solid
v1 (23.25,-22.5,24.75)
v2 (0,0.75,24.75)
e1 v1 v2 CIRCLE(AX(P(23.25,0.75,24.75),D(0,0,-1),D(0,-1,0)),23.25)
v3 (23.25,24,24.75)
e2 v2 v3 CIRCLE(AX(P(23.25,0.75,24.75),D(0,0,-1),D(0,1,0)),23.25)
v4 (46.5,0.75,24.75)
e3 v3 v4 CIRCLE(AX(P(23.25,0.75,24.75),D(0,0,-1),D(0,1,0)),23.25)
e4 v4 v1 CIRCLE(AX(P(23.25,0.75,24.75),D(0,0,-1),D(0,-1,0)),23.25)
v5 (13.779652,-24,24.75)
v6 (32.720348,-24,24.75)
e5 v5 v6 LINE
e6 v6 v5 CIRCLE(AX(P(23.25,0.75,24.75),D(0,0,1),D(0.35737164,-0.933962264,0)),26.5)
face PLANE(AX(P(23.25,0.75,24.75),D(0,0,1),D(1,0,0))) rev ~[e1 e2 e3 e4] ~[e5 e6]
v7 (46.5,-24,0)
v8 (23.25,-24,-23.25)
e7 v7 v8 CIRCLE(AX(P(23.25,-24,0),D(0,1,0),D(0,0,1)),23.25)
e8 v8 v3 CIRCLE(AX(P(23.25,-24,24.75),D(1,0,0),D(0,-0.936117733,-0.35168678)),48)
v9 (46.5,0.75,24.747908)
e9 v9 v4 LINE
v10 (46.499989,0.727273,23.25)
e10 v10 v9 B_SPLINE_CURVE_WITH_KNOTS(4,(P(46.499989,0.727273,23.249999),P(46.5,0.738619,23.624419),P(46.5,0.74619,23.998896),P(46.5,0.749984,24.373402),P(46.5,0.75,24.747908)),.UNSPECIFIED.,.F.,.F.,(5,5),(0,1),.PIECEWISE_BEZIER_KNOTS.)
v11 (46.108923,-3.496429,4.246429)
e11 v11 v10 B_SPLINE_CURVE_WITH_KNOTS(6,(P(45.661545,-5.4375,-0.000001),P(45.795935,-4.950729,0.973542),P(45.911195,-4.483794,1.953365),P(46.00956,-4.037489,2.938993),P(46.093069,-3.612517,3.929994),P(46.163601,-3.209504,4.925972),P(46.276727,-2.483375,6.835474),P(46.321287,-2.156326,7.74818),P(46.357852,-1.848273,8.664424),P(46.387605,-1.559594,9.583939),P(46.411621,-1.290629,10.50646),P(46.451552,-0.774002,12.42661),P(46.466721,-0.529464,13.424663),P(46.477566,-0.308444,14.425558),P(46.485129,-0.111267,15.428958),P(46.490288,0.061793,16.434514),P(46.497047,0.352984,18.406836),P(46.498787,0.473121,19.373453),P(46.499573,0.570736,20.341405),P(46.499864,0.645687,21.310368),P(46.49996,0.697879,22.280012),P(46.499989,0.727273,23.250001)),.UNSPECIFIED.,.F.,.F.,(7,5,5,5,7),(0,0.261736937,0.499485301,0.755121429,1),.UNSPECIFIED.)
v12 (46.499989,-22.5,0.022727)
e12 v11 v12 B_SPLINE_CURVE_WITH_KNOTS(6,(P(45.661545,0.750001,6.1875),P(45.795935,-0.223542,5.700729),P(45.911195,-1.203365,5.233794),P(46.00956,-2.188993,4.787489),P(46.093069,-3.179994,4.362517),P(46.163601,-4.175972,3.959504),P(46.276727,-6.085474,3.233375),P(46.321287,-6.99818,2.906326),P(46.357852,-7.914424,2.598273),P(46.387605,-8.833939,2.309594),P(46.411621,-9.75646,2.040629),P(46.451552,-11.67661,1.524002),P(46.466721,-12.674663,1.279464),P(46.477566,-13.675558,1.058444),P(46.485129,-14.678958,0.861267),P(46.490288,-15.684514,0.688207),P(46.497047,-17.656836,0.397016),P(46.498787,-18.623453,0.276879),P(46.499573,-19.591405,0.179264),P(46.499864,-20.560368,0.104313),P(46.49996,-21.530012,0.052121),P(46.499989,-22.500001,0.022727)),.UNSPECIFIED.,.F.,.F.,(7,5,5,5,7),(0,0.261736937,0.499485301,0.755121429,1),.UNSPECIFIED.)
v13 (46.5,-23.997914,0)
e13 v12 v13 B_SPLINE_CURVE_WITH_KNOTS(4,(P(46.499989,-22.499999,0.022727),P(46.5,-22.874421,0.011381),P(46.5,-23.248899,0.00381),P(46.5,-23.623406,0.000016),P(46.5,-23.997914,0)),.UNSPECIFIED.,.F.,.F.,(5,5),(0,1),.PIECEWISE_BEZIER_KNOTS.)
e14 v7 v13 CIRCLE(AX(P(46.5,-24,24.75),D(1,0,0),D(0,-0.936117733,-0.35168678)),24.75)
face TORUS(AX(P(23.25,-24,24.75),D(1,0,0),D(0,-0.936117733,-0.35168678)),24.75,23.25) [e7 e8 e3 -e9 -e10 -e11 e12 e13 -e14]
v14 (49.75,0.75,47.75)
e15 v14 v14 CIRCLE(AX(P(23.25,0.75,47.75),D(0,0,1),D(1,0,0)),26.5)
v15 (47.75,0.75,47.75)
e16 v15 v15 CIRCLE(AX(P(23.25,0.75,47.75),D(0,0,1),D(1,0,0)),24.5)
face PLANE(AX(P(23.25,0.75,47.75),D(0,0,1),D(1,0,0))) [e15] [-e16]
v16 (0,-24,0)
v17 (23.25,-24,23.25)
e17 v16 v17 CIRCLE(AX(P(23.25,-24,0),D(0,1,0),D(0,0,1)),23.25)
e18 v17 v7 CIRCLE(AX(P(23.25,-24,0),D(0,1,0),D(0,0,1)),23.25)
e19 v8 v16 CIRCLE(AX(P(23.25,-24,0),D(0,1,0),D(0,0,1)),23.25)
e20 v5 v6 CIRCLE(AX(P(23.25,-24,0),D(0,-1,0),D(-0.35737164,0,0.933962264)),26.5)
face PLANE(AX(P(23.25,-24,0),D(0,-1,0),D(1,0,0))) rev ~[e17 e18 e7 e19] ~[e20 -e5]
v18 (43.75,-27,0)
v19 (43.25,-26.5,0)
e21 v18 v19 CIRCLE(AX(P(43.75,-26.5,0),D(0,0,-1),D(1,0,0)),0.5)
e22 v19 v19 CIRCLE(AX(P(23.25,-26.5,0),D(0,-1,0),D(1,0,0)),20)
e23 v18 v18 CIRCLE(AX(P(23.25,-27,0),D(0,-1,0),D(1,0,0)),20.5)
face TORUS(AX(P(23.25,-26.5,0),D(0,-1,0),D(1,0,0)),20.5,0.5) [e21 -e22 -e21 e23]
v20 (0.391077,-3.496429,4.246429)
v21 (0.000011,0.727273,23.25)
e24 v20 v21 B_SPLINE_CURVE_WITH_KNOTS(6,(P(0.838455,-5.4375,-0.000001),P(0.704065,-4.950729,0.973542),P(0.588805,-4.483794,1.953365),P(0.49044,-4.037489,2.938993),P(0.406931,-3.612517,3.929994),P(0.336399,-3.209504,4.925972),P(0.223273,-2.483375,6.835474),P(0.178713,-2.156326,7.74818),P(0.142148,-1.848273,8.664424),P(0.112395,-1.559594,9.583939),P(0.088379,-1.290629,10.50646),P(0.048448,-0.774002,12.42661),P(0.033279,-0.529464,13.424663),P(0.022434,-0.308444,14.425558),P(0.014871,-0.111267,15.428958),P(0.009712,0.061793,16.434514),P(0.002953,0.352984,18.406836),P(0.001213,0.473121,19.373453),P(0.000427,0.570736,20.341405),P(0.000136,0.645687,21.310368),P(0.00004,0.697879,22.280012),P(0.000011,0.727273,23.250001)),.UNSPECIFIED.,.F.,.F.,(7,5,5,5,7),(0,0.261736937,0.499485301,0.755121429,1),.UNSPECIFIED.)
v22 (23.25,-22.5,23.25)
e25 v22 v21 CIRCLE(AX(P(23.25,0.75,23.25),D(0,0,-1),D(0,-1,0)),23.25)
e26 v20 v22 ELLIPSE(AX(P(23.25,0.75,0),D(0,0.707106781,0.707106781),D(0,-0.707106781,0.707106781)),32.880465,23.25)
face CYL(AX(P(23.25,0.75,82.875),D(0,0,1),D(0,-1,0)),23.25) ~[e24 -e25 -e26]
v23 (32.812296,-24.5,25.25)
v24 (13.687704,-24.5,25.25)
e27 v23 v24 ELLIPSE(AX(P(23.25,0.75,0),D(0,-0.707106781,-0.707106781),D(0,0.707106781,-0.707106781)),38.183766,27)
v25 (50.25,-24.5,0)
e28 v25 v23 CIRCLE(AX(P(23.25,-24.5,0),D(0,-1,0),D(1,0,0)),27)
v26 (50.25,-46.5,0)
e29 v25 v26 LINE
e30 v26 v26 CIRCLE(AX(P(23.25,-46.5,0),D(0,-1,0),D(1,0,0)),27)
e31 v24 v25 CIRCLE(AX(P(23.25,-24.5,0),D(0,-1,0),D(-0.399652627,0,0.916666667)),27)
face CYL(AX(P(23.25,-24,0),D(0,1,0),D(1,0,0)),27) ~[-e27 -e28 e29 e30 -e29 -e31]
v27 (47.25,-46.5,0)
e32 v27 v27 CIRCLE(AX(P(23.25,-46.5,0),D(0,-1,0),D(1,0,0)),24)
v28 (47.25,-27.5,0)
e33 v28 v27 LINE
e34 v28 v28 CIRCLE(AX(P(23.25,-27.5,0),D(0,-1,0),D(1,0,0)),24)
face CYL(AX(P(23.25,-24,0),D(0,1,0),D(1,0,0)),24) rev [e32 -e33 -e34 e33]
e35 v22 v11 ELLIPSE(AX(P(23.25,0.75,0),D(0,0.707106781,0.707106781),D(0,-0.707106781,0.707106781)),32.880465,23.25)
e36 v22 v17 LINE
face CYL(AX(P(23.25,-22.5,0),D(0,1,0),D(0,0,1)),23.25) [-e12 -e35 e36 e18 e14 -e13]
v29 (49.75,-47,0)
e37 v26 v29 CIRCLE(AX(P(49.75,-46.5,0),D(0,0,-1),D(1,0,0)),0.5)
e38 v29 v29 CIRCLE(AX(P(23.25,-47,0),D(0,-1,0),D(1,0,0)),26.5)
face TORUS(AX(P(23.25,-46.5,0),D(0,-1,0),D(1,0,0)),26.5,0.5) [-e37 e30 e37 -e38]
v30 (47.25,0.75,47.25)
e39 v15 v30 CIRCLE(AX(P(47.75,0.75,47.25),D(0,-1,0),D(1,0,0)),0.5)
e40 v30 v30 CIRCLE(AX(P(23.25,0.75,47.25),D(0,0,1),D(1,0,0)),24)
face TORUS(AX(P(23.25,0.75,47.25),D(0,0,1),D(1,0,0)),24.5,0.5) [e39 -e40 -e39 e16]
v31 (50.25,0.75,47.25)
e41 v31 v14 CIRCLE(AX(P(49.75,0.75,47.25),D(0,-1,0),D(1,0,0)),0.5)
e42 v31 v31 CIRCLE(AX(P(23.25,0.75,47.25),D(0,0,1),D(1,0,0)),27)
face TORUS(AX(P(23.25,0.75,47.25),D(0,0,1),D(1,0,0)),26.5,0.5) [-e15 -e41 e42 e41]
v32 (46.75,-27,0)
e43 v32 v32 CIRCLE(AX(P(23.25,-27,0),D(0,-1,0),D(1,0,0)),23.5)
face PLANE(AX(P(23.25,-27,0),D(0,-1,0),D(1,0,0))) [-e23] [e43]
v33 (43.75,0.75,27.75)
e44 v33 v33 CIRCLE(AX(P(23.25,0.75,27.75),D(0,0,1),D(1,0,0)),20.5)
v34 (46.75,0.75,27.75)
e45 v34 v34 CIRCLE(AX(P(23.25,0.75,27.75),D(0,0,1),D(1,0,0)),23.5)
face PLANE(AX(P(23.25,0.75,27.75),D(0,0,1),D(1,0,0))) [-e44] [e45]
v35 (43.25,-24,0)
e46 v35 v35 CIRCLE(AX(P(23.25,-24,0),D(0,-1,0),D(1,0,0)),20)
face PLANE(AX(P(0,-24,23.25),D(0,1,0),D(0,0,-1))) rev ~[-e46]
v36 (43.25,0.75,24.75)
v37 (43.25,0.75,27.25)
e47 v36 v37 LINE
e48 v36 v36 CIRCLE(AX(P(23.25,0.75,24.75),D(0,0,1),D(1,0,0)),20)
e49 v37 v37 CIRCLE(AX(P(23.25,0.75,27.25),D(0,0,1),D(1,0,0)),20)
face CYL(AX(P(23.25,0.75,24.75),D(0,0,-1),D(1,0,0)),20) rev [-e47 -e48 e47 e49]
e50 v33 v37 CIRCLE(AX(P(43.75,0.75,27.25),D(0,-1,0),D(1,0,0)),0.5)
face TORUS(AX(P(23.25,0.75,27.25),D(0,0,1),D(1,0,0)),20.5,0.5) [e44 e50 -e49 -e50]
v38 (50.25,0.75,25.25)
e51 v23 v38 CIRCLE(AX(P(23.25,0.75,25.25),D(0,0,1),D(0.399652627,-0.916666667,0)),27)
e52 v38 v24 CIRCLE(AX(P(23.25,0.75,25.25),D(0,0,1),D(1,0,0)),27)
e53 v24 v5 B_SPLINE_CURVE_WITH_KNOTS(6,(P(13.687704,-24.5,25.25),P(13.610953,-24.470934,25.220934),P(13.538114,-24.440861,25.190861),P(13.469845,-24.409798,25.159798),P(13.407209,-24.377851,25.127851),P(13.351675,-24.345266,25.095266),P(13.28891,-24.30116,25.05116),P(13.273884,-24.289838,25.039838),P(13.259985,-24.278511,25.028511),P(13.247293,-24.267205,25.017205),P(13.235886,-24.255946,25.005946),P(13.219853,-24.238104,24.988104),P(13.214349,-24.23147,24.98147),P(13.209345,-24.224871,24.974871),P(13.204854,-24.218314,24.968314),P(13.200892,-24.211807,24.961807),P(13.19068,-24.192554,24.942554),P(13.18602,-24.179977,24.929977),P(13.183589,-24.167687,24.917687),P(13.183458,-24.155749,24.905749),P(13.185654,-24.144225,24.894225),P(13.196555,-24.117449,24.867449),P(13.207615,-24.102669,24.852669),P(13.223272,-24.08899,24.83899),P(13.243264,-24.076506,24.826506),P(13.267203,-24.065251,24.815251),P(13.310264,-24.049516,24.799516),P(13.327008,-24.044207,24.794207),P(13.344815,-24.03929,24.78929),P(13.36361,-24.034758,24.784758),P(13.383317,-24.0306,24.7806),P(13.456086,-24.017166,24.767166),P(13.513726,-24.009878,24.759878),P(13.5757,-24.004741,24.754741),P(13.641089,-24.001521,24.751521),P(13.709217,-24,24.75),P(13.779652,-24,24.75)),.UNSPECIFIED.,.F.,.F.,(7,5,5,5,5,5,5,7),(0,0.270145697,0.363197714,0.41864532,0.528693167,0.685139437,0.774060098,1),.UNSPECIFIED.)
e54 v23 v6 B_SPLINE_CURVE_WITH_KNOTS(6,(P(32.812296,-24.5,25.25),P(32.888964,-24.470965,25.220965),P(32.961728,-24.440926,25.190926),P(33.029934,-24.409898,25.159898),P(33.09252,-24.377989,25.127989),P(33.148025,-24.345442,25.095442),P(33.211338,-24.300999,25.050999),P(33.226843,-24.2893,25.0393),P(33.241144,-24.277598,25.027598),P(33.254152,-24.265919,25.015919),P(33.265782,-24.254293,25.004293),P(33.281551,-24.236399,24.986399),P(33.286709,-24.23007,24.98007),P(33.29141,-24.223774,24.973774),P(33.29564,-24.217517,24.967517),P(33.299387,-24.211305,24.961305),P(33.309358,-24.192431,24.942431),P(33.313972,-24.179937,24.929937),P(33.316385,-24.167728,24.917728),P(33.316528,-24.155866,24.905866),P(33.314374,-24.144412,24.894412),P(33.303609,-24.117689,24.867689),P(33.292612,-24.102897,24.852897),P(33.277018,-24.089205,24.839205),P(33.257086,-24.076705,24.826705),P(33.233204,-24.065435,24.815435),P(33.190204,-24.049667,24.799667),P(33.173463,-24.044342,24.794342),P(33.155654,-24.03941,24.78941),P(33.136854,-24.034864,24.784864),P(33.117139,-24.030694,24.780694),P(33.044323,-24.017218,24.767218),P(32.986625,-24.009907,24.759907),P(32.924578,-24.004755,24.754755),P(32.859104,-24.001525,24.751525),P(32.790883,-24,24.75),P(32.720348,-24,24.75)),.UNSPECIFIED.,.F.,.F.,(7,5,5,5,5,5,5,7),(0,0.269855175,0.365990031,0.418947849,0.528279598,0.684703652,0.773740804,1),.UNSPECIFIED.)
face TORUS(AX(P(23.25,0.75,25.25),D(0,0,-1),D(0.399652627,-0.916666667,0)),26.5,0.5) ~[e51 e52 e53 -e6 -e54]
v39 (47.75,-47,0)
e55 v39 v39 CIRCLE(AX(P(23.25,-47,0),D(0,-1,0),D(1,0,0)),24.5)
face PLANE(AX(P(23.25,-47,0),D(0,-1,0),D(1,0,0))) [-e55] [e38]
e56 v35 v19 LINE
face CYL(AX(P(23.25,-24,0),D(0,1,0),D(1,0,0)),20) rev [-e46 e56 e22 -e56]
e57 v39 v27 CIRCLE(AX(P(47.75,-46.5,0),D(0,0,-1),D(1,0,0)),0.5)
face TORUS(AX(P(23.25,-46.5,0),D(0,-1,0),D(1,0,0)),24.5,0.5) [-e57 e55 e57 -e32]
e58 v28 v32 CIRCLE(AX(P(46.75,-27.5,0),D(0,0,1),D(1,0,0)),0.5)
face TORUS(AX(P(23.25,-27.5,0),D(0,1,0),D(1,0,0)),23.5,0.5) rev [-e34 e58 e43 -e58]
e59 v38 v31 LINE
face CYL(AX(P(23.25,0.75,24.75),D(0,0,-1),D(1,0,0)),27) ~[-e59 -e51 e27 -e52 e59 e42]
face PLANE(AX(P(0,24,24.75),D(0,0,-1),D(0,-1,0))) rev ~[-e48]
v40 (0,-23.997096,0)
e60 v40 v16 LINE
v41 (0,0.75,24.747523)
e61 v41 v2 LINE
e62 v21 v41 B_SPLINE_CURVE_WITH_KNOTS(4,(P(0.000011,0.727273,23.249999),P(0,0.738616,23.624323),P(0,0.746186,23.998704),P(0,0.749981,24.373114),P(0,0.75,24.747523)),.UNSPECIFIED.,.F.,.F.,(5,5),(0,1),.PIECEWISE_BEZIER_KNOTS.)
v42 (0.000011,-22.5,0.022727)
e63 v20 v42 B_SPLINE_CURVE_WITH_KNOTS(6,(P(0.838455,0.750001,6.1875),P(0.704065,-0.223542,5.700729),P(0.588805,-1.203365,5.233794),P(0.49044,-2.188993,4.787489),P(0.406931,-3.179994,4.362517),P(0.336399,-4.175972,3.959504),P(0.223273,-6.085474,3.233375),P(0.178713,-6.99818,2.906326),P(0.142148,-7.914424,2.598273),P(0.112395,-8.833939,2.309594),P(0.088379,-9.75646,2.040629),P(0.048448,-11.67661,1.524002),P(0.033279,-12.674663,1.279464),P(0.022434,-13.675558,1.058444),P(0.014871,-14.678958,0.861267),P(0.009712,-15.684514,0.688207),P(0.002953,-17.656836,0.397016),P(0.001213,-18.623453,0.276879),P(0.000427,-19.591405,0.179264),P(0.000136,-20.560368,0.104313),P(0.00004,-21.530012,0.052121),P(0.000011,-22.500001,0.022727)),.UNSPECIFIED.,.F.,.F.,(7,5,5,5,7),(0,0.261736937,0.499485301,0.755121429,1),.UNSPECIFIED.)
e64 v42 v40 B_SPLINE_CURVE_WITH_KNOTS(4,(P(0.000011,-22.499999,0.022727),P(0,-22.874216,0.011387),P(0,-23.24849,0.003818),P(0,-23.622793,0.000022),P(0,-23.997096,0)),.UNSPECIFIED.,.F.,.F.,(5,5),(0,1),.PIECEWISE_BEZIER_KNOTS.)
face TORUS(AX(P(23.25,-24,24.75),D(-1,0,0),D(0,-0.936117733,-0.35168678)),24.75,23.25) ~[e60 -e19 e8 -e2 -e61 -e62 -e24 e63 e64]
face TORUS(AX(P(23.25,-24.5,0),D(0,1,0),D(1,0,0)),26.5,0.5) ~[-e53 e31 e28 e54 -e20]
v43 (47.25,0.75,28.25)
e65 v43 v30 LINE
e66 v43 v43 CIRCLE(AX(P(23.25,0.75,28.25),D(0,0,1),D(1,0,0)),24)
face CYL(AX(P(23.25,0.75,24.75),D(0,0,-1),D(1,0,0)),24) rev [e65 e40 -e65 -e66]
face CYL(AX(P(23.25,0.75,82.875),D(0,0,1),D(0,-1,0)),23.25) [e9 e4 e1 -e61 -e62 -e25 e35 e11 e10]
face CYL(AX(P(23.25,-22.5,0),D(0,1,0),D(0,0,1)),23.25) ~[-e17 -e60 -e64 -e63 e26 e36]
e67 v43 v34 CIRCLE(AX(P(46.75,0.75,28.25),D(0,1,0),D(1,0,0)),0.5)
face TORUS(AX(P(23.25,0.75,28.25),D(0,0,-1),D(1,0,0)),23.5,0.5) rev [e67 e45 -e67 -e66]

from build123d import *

# Parameters (mm, degrees)
F1_DEPTH     = 46.5
F2_T1_DEPTH  = 59.625
F2_T3_DEPTH  = 59.625
F2_T6_ANGLE  = 228.8189583237
F2_T8_ANGLE  = 228.8189583237
F2_T13_DEPTH = 117.75
F2_T17_DEPTH = 117.75
F2_T24_DEPTH = 117.75
F2_T28_DEPTH = 117.75
F3_R         = 24
F3_R_2       = 20
F5_DEPTH     = 3
F3_R_3       = 27
F6_DEPTH     = 23
F4_R         = 24
F4_R_2       = 20
F7_DEPTH     = 3
F4_R_3       = 27
F8_DEPTH     = 23
F9_R         = 0.5


# Not quite as in the source:
# - a fillet or chamfer that OpenCascade refuses, or shapes differently, is made with other operations: its cross-section is extruded or revolved along the edge and cut away or added
# - a feature names something its author has since deleted; it is built from what else it names


with BuildPart() as f1:
    # F0 (on Right) → F1 (new body)
    with BuildSketch(Plane.YZ):
        with BuildLine():
            Line((-22.5, 24.75), (-22.5, 23.25))
            Line((-22.5, 23.25), (-24, 23.25))
            Line((-24, 23.25), (-24, -23.25))
            ThreePointArc((-24, -23.25), (9.941125497, -9.191125497), (24, 24.75))
            Line((24, 24.75), (-22.5, 24.75))
        make_face()
    extrude(amount=F1_DEPTH)

    # F2: fillet of radius 23.25 on 6 edges, made by hand

    # F2_s2 → F2_t1 (cut)
    with BuildSketch(Plane.XY.offset(23.25)):
        with BuildLine():
            ThreePointArc((23.25, -22.5), (39.6902326626, -15.6902326626), (46.5, 0.75))
            Line((46.5, 0.75), (46.5, -22.5))
            Line((46.5, -22.5), (23.25, -22.5))
        make_face()
        with BuildLine():
            ThreePointArc((23.25, -22.5), (6.8097673374, -15.6902326626), (0, 0.75))
            Line((0, 0.75), (0, -22.5))
            Line((0, -22.5), (23.25, -22.5))
        make_face()
    extrude(amount=F2_T1_DEPTH, mode=Mode.SUBTRACT)

    # F2_s4 → F2_t3 (cut)
    with BuildSketch(Plane.XZ.offset(22.5)):
        with BuildLine():
            ThreePointArc((23.25, 23.25), (39.6902326626, 16.4402326626), (46.5, 0))
            Line((46.5, 0), (46.5, 23.25))
            Line((46.5, 23.25), (23.25, 23.25))
        make_face()
        with BuildLine():
            ThreePointArc((23.25, 23.25), (6.8097673374, 16.4402326626), (0, 0))
            Line((0, 0), (0, 23.25))
            Line((0, 23.25), (23.25, 23.25))
        make_face()
    extrude(amount=F2_T3_DEPTH, mode=Mode.SUBTRACT)

    # F2_s5 → F2_t6 (revolve, cut)
    with BuildSketch(Plane(origin=(0, -11.1166068872, 29.5901166597), x_dir=(1, 0, 0), z_dir=(0, -0.3516867795, 0.9361177325))):
        with BuildLine():
            ThreePointArc((23.25, -61.7625777883), (6.8097673374, -54.9528104509), (0, -38.5125777883))
            Line((0, -38.5125777883), (0, -61.7625777883))
            Line((0, -61.7625777883), (23.25, -61.7625777883))
        make_face()
    revolve(axis=Axis((0, -24, 24.75), (1, 0, 0)), revolution_arc=F2_T6_ANGLE, mode=Mode.SUBTRACT)

    # F2_s7 → F2_t8 (revolve, cut)
    with BuildSketch(Plane(origin=(0, -11.1166068872, 29.5901166597), x_dir=(1, 0, 0), z_dir=(0, -0.3516867795, 0.9361177325))):
        with BuildLine():
            ThreePointArc((23.25, -61.7625777883), (39.6902326626, -54.9528104509), (46.5, -38.5125777883))
            Line((46.5, -38.5125777883), (46.5, -61.7625777883))
            Line((46.5, -61.7625777883), (23.25, -61.7625777883))
        make_face()
    revolve(axis=Axis((46.5, -24, 24.75), (1, 0, 0)), revolution_arc=F2_T8_ANGLE, mode=Mode.SUBTRACT)


with BuildPart() as f2_tool11:
    # F2_s12 → F2_t13 (new body)
    with BuildSketch(Plane.XY.offset(82.875)):
        with BuildLine():
            ThreePointArc((23.25, -22.5), (39.6902326626, -15.6902326626), (46.5, 0.75))
            Line((46.5, 0.75), (46.5, -22.5))
            Line((46.5, -22.5), (23.25, -22.5))
        make_face()
    extrude(amount=-F2_T13_DEPTH)

    split(bisect_by=Plane.XY.offset(23.25), keep=Keep.BOTTOM)


with BuildPart() as f2_tool15:
    # F2_s16 → F2_t17 (new body)
    with BuildSketch(Plane.XZ.offset(-35.625)):
        with BuildLine():
            ThreePointArc((23.25, 23.25), (39.6902326626, 16.4402326626), (46.5, 0))
            Line((46.5, 0), (46.5, 23.25))
            Line((46.5, 23.25), (23.25, 23.25))
        make_face()
    extrude(amount=F2_T17_DEPTH)

    split(bisect_by=Plane.XZ.offset(22.5), keep=Keep.BOTTOM)


with BuildPart() as f2_tool11_1:
    add(f2_tool11.part)

    # F2_t19: intersect F2_tool15
    add(f2_tool15.part, mode=Mode.INTERSECT)


with BuildPart() as f1_1:
    add(f1.part)

    # F2_t9: cut F2_tool11
    add(f2_tool11_1.part, mode=Mode.SUBTRACT)


with BuildPart() as f2_tool22:
    # F2_s23 → F2_t24 (new body)
    with BuildSketch(Plane.XY.offset(82.875)):
        with BuildLine():
            ThreePointArc((23.25, -22.5), (6.8097673374, -15.6902326626), (0, 0.75))
            Line((0, 0.75), (0, -22.5))
            Line((0, -22.5), (23.25, -22.5))
        make_face()
    extrude(amount=-F2_T24_DEPTH)

    split(bisect_by=Plane.XY.offset(23.25), keep=Keep.BOTTOM)


with BuildPart() as f2_tool26:
    # F2_s27 → F2_t28 (new body)
    with BuildSketch(Plane.XZ.offset(-35.625)):
        with BuildLine():
            ThreePointArc((23.25, 23.25), (6.8097673374, 16.4402326626), (0, 0))
            Line((0, 0), (0, 23.25))
            Line((0, 23.25), (23.25, 23.25))
        make_face()
    extrude(amount=F2_T28_DEPTH)

    split(bisect_by=Plane.XZ.offset(22.5), keep=Keep.BOTTOM)


with BuildPart() as f2_tool22_1:
    add(f2_tool22.part)

    # F2_t30: intersect F2_tool26
    add(f2_tool26.part, mode=Mode.INTERSECT)


with BuildPart() as f1_2:
    add(f1_1.part)

    # F2_t20: cut F2_tool22
    add(f2_tool22_1.part, mode=Mode.SUBTRACT)

    # F3 (on face) → F5 (join)
    with BuildSketch(Plane.XY.offset(24.75)):
        with Locations((23.25, 0.75)):
            Circle(F3_R)
        with BuildLine():
            ThreePointArc((46.5, 0.75), (39.6902326626, -15.6902326626), (23.25, -22.5))
            ThreePointArc((23.25, -22.5), (6.8097673374, -15.6902326626), (0, 0.75))
            ThreePointArc((0, 0.75), (6.8097673374, 17.1902326626), (23.25, 24))
            ThreePointArc((23.25, 24), (39.6902326626, 17.1902326626), (46.5, 0.75))
        make_face(mode=Mode.SUBTRACT)
        with BuildLine():
            ThreePointArc((0, 0.75), (6.8097673374, -15.6902326626), (23.25, -22.5))
            ThreePointArc((23.25, -22.5), (39.6902326626, -15.6902326626), (46.5, 0.75))
            ThreePointArc((46.5, 0.75), (39.6902326626, 17.1902326626), (23.25, 24))
            ThreePointArc((23.25, 24), (6.8097673374, 17.1902326626), (0, 0.75))
        make_face()
        with Locations((23.25, 0.75)):
            Circle(F3_R_2, mode=Mode.SUBTRACT)
    extrude(amount=F5_DEPTH)

    # F3 (on face) → F6 (join)
    with BuildSketch(Plane.XY.offset(24.75)):
        with Locations((23.25, 0.75)):
            Circle(F3_R_3)
        with Locations((23.25, 0.75)):
            Circle(F3_R, mode=Mode.SUBTRACT)
    extrude(amount=F6_DEPTH)

    # F4 (on face) → F7 (join)
    with BuildSketch(Plane.XZ.offset(24)):
        with Locations((23.25, 0)):
            Circle(F4_R)
        with BuildLine():
            ThreePointArc((46.5, 0), (39.6902326626, -16.4402326626), (23.25, -23.25))
            ThreePointArc((23.25, -23.25), (6.8097673374, -16.4402326626), (0, 0))
            ThreePointArc((0, 0), (6.8097673374, 16.4402326626), (23.25, 23.25))
            ThreePointArc((23.25, 23.25), (39.6902326626, 16.4402326626), (46.5, 0))
        make_face(mode=Mode.SUBTRACT)
        with BuildLine():
            ThreePointArc((0, 0), (6.8097673374, -16.4402326626), (23.25, -23.25))
            ThreePointArc((23.25, -23.25), (39.6902326626, -16.4402326626), (46.5, 0))
            ThreePointArc((46.5, 0), (39.6902326626, 16.4402326626), (23.25, 23.25))
            ThreePointArc((23.25, 23.25), (6.8097673374, 16.4402326626), (0, 0))
        make_face()
        with Locations((23.25, 0)):
            Circle(F4_R_2, mode=Mode.SUBTRACT)
    extrude(amount=F7_DEPTH)

    # F4 (on face) → F8 (join)
    with BuildSketch(Plane.XZ.offset(24)):
        with Locations((23.25, 0)):
            Circle(F4_R_3)
        with Locations((23.25, 0)):
            Circle(F4_R, mode=Mode.SUBTRACT)
    extrude(amount=F8_DEPTH)

    # F9
    f9_edges = [f1_2.edges().sort_by_distance(p)[0] for p in [
        (8.457211, -24, -22.587018),
        (8.457211, 23.337018, 24.75),
        (-3.75, -47, 0),
        (-0.75, -47, 0),
        (-3.75, 0.75, 47.75),
        (-0.75, 0.75, 47.75),
        (-0.75, 0.75, 27.75),
        (3.25, 0.75, 27.75),
        (3.25, -27, 0),
        (-0.75, -27, 0),
    ]]
    fillet(f9_edges, radius=F9_R)


solid = f1_2.part
